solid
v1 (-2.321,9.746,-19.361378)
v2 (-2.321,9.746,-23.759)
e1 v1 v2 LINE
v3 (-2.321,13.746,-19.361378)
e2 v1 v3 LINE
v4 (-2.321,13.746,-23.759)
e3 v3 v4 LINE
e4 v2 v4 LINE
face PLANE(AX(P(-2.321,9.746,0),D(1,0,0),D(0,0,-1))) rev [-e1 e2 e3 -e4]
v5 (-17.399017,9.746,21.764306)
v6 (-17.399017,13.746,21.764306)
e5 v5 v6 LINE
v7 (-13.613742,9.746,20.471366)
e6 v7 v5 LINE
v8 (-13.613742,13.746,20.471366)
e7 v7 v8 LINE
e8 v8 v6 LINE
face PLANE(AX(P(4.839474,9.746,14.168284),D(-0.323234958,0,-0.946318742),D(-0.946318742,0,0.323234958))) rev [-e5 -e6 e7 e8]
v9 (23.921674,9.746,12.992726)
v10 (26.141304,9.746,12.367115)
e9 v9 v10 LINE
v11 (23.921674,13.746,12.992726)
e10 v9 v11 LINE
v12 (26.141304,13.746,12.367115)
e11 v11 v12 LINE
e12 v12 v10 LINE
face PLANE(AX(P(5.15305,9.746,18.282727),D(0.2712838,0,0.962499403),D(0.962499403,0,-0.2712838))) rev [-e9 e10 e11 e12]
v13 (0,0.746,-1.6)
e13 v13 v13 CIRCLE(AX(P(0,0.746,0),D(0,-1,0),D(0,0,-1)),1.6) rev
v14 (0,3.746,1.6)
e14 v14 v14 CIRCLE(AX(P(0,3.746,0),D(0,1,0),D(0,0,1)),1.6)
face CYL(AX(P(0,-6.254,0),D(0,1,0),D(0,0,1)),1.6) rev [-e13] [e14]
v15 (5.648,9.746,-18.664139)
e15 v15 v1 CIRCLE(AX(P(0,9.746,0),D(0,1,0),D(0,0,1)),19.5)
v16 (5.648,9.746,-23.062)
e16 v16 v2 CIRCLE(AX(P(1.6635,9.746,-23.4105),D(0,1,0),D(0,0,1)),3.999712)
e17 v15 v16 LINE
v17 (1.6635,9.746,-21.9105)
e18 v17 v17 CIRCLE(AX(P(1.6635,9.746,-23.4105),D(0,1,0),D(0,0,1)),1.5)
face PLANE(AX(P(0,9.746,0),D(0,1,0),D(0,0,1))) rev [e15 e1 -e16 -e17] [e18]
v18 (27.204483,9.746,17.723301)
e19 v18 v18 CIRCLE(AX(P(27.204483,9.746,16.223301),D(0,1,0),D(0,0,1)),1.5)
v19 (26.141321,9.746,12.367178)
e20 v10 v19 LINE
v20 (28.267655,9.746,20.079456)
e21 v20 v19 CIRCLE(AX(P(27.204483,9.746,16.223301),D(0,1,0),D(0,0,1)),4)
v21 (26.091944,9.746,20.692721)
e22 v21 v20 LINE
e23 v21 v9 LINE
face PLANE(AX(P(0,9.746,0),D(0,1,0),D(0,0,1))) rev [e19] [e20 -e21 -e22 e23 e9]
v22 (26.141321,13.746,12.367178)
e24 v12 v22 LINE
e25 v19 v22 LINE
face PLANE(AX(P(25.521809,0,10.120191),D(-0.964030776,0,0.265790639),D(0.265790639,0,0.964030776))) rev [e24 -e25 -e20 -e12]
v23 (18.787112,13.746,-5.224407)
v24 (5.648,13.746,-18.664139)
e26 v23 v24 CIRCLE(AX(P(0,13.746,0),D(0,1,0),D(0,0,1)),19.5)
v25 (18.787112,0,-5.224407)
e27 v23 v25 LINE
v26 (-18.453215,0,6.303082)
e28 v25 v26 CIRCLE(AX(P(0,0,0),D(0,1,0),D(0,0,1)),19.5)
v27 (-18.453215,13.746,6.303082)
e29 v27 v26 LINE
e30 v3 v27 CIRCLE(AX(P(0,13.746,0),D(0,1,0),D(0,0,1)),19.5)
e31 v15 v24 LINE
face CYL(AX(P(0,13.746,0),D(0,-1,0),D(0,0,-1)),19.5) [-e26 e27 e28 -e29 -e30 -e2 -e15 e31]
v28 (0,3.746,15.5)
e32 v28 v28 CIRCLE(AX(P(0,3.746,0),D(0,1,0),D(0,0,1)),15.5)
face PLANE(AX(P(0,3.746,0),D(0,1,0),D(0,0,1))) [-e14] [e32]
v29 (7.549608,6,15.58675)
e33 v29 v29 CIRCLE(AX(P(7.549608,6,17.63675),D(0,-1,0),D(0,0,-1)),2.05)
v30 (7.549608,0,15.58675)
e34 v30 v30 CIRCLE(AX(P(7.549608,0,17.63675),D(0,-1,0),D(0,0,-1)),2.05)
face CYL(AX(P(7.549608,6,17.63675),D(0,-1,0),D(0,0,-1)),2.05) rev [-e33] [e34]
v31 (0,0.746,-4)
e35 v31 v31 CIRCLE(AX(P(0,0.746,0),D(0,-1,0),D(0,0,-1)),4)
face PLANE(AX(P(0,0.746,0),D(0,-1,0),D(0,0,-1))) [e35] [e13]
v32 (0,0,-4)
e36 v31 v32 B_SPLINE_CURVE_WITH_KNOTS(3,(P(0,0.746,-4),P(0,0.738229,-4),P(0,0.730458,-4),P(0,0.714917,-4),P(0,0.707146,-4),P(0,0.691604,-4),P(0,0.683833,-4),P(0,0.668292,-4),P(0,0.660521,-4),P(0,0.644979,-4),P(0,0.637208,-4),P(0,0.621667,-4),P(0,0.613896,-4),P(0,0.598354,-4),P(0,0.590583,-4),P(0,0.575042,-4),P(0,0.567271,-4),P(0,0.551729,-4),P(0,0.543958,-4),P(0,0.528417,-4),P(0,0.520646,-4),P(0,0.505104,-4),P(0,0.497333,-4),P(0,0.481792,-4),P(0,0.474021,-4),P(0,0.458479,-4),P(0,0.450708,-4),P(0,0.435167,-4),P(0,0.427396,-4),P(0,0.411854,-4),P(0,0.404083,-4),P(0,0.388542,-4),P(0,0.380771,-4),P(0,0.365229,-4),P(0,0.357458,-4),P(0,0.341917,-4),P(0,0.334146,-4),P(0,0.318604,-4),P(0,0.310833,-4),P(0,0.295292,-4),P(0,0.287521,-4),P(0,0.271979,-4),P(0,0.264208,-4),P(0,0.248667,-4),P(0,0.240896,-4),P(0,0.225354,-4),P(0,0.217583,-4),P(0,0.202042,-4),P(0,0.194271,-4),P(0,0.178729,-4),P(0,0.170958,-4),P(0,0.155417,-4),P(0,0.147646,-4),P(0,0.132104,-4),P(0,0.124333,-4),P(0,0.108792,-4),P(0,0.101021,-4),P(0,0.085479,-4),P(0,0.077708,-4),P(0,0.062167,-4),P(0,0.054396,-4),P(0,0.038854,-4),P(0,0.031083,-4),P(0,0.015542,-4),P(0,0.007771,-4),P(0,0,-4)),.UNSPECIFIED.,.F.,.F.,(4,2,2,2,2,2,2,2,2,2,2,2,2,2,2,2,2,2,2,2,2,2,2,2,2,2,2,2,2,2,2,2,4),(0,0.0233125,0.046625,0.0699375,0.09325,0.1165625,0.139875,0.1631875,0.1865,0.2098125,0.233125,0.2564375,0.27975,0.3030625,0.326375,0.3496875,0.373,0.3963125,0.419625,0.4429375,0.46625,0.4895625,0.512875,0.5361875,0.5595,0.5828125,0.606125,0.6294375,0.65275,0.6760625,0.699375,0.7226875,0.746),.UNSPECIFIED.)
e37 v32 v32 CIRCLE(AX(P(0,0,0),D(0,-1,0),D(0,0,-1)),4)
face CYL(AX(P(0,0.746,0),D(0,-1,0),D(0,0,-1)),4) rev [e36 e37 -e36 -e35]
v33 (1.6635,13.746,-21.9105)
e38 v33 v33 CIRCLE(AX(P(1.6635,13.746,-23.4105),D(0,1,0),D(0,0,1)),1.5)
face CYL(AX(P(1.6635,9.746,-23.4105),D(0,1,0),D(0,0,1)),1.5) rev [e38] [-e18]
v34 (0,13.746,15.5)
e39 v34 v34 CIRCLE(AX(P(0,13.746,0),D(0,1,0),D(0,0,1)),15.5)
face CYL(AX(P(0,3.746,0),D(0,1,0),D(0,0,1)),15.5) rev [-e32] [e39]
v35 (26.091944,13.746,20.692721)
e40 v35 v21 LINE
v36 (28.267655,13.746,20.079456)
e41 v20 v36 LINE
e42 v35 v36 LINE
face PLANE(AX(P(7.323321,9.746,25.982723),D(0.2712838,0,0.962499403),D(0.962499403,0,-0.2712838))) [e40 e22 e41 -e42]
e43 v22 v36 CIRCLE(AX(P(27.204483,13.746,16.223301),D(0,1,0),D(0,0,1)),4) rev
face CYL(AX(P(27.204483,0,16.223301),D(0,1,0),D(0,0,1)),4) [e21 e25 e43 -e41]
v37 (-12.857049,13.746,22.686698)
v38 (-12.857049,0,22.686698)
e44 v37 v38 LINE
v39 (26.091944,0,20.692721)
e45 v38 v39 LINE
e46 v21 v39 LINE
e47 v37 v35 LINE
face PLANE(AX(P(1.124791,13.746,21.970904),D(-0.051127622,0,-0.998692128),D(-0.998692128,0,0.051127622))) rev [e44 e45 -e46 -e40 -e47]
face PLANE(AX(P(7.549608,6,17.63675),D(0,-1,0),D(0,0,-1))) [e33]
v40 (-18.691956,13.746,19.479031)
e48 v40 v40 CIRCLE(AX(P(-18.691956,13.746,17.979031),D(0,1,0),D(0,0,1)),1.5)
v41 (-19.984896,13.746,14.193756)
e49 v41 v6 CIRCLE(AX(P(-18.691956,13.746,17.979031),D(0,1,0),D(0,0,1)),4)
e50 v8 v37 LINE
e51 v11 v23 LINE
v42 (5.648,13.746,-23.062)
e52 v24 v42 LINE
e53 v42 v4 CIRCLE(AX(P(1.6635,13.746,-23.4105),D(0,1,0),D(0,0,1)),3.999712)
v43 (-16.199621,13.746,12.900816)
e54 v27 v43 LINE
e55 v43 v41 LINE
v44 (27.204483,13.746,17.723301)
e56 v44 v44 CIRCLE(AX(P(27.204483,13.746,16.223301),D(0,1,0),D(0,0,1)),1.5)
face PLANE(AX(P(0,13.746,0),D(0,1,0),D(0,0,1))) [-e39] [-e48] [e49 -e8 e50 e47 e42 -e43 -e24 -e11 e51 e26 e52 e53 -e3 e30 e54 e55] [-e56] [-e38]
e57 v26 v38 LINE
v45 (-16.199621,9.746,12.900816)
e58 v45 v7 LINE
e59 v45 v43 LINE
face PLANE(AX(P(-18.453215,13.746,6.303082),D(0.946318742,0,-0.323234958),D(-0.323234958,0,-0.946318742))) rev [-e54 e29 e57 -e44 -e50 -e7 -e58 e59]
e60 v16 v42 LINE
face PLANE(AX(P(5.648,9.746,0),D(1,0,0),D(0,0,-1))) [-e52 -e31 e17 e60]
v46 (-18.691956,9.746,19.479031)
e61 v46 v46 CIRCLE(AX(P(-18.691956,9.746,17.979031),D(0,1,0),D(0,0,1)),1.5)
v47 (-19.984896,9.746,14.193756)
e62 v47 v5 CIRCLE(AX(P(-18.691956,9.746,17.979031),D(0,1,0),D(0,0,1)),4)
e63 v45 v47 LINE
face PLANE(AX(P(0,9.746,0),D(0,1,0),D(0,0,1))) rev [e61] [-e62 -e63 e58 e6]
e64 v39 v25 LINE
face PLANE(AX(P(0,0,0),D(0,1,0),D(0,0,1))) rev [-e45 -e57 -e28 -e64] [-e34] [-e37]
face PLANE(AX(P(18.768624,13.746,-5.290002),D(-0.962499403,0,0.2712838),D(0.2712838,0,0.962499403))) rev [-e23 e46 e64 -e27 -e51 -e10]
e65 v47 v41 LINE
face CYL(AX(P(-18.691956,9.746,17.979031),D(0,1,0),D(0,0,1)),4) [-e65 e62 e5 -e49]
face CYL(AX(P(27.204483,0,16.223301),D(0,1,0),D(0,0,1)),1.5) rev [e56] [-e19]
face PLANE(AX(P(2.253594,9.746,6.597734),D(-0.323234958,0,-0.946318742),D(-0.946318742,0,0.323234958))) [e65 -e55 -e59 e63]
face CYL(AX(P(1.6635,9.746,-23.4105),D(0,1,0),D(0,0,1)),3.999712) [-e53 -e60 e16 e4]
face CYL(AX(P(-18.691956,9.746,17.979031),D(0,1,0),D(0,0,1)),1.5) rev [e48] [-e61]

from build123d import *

# Parameters (mm, degrees)
SALIENTE_EXTRUIR1_DEPTH = 13.746
CROQUIS2_R              = 15.5
CORTAR_EXTRUIR1_DEPTH   = 10
CROQUIS3_R              = 1.6
CORTAR_EXTRUIR2_DEPTH   = 10
SALIENTE_EXTRUIR2_START = -4
CROQUIS4_R              = 1.5
SALIENTE_EXTRUIR2_DEPTH = 4
CORTAR_EXTRUIR3_DEPTH   = 45.978374576
CROQUIS6_R              = 1.5
CORTAR_EXTRUIR4_DEPTH   = 44.749194214
CROQUIS7_R              = 2.05
CORTAR_EXTRUIR5_DEPTH   = 6
CROQUIS8_R              = 4
CORTAR_EXTRUIR6_DEPTH   = 0.746


# Read off the part's stored shape, not the designer's step: Saliente-Extruir1
with BuildPart() as part:
    # Saliente-Extruir1 outline → Saliente-Extruir1 (new body)
    with BuildSketch(Plane(origin=(0, 0, 0), x_dir=(1, 0, 0), z_dir=(0, 1, 0))):
        with BuildLine():
            Line((26.09194434, -20.692720824), (18.78711178, 5.224407236))
            ThreePointArc((18.78711178, 5.224407236), (-5.766161796, 18.627973001), (-18.453215474, -6.30308168))
            Line((-18.453215474, -6.30308168), (-12.857048648, -22.686698065))
            Line((-12.857048648, -22.686698065), (26.09194434, -20.692720824))
        make_face()
    extrude(amount=SALIENTE_EXTRUIR1_DEPTH)

    # Croquis2 → Cortar-Extruir1 (cut)
    with BuildSketch(Plane(origin=(0, 13.746, 0), x_dir=(1, 0, 0), z_dir=(0, 1, 0))):
        with Locations(Location((0, 0, 0), (0, 0, 270))):
            Circle(CROQUIS2_R)
    extrude(amount=-CORTAR_EXTRUIR1_DEPTH, mode=Mode.SUBTRACT)

    # Croquis3 → Cortar-Extruir2 (cut)
    with BuildSketch(Plane(origin=(0, 3.746, 0), x_dir=(1, 0, 0), z_dir=(0, 1, 0))):
        with Locations(Location((0, 0, 0), (0, 0, 270))):
            Circle(CROQUIS3_R)
    extrude(amount=-CORTAR_EXTRUIR2_DEPTH, mode=Mode.SUBTRACT)

    # Croquis4 → Saliente-Extruir2 (add)
    # profile 1 of 3: a face of its own
    with BuildSketch(Plane(origin=(0, 13.746, 0), x_dir=(1, 0, 0), z_dir=(0, 1, 0)).offset(SALIENTE_EXTRUIR2_START)):
        with BuildLine():
            Line((-17.399016653, -21.764305721), (-13.613741684, -20.471365889))
            Line((-13.613741684, -20.471365889), (-16.199621348, -12.900815951))
            Line((-16.199621348, -12.900815951), (-19.984896317, -14.193755782))
            ThreePointArc((-19.984896317, -14.193755782), (-22.477231454, -19.271970583), (-17.399016653, -21.764305721))
        make_face()
        with Locations(Location((-18.691956485, -17.979030752, 0), (0, 0, 270))):
            Circle(CROQUIS4_R, mode=Mode.SUBTRACT)
    # profile 2 of 3: a face of its own
    with BuildSketch(Plane(origin=(0, 13.746, 0), x_dir=(1, 0, 0), z_dir=(0, 1, 0)).offset(SALIENTE_EXTRUIR2_START)):
        with BuildLine():
            Line((23.921673943, -12.992725603), (26.09194434, -20.692720824))
            Line((26.09194434, -20.692720824), (29.941941951, -19.607585626))
            ThreePointArc((29.941941951, -19.607585626), (32.75563819, -14.658688833), (27.771671554, -11.907590405))
            Line((27.771671554, -11.907590405), (23.921673943, -12.992725603))
        make_face()
    # profile 3 of 3: a face of its own
    with BuildSketch(Plane(origin=(0, 13.746, 0), x_dir=(1, 0, 0), z_dir=(0, 1, 0)).offset(SALIENTE_EXTRUIR2_START)):
        with BuildLine():
            Line((-2.321, 23.759), (-2.321, 19.361378024))
            ThreePointArc((-2.321, 19.361378024), (1.699637522, 19.425787816), (5.648, 18.664139305))
            Line((5.648, 18.664139305), (5.648, 23.062))
            ThreePointArc((5.648, 23.062), (2.012, 27.395), (-2.321, 23.759))
        make_face()
        with Locations(Location((1.6635, 23.4105, 0), (0, 0, 270))):
            Circle(CROQUIS4_R, mode=Mode.SUBTRACT)
    extrude(amount=SALIENTE_EXTRUIR2_DEPTH)

    # Croquis5 → Cortar-Extruir3 (cut, through all)
    with BuildSketch(Plane(origin=(0, 13.746, 0), x_dir=(1, 0, 0), z_dir=(0, 1, 0))):
        with BuildLine():
            Line((25.521809268, -10.120190748), (26.141320794, -12.367178003))
            ThreePointArc((26.141320794, -12.367178003), (31.060606452, -15.160138551), (28.267645904, -20.079424208))
            Line((28.267645904, -20.079424208), (28.88715743, -22.326411463))
            ThreePointArc((28.88715743, -22.326411463), (33.307593706, -14.540627024), (25.521809268, -10.120190748))
        make_face()
    extrude(amount=-CORTAR_EXTRUIR3_DEPTH, mode=Mode.SUBTRACT)

    # Croquis6 → Cortar-Extruir4 (cut, through all)
    with BuildSketch(Plane(origin=(0, 13.746, 0), x_dir=(1, 0, 0), z_dir=(0, 1, 0))):
        with Locations(Location((27.204483349, -16.223301105, 0), (0, 0, 270))):
            Circle(CROQUIS6_R)
    extrude(amount=-CORTAR_EXTRUIR4_DEPTH, mode=Mode.SUBTRACT)

    # Croquis7 → Cortar-Extruir5 (cut)
    with BuildSketch(Plane.XZ):
        with Locations(Location((7.549608222, 17.636749548, 0), (0, 0, 270))):
            Circle(CROQUIS7_R)
    extrude(amount=-CORTAR_EXTRUIR5_DEPTH, mode=Mode.SUBTRACT)

    # Croquis8 → Cortar-Extruir6 (cut)
    with BuildSketch(Plane.XZ):
        with Locations(Location((0, 0, 0), (0, 0, 270))):
            Circle(CROQUIS8_R)
    extrude(amount=-CORTAR_EXTRUIR6_DEPTH, mode=Mode.SUBTRACT)


solid = part.part
